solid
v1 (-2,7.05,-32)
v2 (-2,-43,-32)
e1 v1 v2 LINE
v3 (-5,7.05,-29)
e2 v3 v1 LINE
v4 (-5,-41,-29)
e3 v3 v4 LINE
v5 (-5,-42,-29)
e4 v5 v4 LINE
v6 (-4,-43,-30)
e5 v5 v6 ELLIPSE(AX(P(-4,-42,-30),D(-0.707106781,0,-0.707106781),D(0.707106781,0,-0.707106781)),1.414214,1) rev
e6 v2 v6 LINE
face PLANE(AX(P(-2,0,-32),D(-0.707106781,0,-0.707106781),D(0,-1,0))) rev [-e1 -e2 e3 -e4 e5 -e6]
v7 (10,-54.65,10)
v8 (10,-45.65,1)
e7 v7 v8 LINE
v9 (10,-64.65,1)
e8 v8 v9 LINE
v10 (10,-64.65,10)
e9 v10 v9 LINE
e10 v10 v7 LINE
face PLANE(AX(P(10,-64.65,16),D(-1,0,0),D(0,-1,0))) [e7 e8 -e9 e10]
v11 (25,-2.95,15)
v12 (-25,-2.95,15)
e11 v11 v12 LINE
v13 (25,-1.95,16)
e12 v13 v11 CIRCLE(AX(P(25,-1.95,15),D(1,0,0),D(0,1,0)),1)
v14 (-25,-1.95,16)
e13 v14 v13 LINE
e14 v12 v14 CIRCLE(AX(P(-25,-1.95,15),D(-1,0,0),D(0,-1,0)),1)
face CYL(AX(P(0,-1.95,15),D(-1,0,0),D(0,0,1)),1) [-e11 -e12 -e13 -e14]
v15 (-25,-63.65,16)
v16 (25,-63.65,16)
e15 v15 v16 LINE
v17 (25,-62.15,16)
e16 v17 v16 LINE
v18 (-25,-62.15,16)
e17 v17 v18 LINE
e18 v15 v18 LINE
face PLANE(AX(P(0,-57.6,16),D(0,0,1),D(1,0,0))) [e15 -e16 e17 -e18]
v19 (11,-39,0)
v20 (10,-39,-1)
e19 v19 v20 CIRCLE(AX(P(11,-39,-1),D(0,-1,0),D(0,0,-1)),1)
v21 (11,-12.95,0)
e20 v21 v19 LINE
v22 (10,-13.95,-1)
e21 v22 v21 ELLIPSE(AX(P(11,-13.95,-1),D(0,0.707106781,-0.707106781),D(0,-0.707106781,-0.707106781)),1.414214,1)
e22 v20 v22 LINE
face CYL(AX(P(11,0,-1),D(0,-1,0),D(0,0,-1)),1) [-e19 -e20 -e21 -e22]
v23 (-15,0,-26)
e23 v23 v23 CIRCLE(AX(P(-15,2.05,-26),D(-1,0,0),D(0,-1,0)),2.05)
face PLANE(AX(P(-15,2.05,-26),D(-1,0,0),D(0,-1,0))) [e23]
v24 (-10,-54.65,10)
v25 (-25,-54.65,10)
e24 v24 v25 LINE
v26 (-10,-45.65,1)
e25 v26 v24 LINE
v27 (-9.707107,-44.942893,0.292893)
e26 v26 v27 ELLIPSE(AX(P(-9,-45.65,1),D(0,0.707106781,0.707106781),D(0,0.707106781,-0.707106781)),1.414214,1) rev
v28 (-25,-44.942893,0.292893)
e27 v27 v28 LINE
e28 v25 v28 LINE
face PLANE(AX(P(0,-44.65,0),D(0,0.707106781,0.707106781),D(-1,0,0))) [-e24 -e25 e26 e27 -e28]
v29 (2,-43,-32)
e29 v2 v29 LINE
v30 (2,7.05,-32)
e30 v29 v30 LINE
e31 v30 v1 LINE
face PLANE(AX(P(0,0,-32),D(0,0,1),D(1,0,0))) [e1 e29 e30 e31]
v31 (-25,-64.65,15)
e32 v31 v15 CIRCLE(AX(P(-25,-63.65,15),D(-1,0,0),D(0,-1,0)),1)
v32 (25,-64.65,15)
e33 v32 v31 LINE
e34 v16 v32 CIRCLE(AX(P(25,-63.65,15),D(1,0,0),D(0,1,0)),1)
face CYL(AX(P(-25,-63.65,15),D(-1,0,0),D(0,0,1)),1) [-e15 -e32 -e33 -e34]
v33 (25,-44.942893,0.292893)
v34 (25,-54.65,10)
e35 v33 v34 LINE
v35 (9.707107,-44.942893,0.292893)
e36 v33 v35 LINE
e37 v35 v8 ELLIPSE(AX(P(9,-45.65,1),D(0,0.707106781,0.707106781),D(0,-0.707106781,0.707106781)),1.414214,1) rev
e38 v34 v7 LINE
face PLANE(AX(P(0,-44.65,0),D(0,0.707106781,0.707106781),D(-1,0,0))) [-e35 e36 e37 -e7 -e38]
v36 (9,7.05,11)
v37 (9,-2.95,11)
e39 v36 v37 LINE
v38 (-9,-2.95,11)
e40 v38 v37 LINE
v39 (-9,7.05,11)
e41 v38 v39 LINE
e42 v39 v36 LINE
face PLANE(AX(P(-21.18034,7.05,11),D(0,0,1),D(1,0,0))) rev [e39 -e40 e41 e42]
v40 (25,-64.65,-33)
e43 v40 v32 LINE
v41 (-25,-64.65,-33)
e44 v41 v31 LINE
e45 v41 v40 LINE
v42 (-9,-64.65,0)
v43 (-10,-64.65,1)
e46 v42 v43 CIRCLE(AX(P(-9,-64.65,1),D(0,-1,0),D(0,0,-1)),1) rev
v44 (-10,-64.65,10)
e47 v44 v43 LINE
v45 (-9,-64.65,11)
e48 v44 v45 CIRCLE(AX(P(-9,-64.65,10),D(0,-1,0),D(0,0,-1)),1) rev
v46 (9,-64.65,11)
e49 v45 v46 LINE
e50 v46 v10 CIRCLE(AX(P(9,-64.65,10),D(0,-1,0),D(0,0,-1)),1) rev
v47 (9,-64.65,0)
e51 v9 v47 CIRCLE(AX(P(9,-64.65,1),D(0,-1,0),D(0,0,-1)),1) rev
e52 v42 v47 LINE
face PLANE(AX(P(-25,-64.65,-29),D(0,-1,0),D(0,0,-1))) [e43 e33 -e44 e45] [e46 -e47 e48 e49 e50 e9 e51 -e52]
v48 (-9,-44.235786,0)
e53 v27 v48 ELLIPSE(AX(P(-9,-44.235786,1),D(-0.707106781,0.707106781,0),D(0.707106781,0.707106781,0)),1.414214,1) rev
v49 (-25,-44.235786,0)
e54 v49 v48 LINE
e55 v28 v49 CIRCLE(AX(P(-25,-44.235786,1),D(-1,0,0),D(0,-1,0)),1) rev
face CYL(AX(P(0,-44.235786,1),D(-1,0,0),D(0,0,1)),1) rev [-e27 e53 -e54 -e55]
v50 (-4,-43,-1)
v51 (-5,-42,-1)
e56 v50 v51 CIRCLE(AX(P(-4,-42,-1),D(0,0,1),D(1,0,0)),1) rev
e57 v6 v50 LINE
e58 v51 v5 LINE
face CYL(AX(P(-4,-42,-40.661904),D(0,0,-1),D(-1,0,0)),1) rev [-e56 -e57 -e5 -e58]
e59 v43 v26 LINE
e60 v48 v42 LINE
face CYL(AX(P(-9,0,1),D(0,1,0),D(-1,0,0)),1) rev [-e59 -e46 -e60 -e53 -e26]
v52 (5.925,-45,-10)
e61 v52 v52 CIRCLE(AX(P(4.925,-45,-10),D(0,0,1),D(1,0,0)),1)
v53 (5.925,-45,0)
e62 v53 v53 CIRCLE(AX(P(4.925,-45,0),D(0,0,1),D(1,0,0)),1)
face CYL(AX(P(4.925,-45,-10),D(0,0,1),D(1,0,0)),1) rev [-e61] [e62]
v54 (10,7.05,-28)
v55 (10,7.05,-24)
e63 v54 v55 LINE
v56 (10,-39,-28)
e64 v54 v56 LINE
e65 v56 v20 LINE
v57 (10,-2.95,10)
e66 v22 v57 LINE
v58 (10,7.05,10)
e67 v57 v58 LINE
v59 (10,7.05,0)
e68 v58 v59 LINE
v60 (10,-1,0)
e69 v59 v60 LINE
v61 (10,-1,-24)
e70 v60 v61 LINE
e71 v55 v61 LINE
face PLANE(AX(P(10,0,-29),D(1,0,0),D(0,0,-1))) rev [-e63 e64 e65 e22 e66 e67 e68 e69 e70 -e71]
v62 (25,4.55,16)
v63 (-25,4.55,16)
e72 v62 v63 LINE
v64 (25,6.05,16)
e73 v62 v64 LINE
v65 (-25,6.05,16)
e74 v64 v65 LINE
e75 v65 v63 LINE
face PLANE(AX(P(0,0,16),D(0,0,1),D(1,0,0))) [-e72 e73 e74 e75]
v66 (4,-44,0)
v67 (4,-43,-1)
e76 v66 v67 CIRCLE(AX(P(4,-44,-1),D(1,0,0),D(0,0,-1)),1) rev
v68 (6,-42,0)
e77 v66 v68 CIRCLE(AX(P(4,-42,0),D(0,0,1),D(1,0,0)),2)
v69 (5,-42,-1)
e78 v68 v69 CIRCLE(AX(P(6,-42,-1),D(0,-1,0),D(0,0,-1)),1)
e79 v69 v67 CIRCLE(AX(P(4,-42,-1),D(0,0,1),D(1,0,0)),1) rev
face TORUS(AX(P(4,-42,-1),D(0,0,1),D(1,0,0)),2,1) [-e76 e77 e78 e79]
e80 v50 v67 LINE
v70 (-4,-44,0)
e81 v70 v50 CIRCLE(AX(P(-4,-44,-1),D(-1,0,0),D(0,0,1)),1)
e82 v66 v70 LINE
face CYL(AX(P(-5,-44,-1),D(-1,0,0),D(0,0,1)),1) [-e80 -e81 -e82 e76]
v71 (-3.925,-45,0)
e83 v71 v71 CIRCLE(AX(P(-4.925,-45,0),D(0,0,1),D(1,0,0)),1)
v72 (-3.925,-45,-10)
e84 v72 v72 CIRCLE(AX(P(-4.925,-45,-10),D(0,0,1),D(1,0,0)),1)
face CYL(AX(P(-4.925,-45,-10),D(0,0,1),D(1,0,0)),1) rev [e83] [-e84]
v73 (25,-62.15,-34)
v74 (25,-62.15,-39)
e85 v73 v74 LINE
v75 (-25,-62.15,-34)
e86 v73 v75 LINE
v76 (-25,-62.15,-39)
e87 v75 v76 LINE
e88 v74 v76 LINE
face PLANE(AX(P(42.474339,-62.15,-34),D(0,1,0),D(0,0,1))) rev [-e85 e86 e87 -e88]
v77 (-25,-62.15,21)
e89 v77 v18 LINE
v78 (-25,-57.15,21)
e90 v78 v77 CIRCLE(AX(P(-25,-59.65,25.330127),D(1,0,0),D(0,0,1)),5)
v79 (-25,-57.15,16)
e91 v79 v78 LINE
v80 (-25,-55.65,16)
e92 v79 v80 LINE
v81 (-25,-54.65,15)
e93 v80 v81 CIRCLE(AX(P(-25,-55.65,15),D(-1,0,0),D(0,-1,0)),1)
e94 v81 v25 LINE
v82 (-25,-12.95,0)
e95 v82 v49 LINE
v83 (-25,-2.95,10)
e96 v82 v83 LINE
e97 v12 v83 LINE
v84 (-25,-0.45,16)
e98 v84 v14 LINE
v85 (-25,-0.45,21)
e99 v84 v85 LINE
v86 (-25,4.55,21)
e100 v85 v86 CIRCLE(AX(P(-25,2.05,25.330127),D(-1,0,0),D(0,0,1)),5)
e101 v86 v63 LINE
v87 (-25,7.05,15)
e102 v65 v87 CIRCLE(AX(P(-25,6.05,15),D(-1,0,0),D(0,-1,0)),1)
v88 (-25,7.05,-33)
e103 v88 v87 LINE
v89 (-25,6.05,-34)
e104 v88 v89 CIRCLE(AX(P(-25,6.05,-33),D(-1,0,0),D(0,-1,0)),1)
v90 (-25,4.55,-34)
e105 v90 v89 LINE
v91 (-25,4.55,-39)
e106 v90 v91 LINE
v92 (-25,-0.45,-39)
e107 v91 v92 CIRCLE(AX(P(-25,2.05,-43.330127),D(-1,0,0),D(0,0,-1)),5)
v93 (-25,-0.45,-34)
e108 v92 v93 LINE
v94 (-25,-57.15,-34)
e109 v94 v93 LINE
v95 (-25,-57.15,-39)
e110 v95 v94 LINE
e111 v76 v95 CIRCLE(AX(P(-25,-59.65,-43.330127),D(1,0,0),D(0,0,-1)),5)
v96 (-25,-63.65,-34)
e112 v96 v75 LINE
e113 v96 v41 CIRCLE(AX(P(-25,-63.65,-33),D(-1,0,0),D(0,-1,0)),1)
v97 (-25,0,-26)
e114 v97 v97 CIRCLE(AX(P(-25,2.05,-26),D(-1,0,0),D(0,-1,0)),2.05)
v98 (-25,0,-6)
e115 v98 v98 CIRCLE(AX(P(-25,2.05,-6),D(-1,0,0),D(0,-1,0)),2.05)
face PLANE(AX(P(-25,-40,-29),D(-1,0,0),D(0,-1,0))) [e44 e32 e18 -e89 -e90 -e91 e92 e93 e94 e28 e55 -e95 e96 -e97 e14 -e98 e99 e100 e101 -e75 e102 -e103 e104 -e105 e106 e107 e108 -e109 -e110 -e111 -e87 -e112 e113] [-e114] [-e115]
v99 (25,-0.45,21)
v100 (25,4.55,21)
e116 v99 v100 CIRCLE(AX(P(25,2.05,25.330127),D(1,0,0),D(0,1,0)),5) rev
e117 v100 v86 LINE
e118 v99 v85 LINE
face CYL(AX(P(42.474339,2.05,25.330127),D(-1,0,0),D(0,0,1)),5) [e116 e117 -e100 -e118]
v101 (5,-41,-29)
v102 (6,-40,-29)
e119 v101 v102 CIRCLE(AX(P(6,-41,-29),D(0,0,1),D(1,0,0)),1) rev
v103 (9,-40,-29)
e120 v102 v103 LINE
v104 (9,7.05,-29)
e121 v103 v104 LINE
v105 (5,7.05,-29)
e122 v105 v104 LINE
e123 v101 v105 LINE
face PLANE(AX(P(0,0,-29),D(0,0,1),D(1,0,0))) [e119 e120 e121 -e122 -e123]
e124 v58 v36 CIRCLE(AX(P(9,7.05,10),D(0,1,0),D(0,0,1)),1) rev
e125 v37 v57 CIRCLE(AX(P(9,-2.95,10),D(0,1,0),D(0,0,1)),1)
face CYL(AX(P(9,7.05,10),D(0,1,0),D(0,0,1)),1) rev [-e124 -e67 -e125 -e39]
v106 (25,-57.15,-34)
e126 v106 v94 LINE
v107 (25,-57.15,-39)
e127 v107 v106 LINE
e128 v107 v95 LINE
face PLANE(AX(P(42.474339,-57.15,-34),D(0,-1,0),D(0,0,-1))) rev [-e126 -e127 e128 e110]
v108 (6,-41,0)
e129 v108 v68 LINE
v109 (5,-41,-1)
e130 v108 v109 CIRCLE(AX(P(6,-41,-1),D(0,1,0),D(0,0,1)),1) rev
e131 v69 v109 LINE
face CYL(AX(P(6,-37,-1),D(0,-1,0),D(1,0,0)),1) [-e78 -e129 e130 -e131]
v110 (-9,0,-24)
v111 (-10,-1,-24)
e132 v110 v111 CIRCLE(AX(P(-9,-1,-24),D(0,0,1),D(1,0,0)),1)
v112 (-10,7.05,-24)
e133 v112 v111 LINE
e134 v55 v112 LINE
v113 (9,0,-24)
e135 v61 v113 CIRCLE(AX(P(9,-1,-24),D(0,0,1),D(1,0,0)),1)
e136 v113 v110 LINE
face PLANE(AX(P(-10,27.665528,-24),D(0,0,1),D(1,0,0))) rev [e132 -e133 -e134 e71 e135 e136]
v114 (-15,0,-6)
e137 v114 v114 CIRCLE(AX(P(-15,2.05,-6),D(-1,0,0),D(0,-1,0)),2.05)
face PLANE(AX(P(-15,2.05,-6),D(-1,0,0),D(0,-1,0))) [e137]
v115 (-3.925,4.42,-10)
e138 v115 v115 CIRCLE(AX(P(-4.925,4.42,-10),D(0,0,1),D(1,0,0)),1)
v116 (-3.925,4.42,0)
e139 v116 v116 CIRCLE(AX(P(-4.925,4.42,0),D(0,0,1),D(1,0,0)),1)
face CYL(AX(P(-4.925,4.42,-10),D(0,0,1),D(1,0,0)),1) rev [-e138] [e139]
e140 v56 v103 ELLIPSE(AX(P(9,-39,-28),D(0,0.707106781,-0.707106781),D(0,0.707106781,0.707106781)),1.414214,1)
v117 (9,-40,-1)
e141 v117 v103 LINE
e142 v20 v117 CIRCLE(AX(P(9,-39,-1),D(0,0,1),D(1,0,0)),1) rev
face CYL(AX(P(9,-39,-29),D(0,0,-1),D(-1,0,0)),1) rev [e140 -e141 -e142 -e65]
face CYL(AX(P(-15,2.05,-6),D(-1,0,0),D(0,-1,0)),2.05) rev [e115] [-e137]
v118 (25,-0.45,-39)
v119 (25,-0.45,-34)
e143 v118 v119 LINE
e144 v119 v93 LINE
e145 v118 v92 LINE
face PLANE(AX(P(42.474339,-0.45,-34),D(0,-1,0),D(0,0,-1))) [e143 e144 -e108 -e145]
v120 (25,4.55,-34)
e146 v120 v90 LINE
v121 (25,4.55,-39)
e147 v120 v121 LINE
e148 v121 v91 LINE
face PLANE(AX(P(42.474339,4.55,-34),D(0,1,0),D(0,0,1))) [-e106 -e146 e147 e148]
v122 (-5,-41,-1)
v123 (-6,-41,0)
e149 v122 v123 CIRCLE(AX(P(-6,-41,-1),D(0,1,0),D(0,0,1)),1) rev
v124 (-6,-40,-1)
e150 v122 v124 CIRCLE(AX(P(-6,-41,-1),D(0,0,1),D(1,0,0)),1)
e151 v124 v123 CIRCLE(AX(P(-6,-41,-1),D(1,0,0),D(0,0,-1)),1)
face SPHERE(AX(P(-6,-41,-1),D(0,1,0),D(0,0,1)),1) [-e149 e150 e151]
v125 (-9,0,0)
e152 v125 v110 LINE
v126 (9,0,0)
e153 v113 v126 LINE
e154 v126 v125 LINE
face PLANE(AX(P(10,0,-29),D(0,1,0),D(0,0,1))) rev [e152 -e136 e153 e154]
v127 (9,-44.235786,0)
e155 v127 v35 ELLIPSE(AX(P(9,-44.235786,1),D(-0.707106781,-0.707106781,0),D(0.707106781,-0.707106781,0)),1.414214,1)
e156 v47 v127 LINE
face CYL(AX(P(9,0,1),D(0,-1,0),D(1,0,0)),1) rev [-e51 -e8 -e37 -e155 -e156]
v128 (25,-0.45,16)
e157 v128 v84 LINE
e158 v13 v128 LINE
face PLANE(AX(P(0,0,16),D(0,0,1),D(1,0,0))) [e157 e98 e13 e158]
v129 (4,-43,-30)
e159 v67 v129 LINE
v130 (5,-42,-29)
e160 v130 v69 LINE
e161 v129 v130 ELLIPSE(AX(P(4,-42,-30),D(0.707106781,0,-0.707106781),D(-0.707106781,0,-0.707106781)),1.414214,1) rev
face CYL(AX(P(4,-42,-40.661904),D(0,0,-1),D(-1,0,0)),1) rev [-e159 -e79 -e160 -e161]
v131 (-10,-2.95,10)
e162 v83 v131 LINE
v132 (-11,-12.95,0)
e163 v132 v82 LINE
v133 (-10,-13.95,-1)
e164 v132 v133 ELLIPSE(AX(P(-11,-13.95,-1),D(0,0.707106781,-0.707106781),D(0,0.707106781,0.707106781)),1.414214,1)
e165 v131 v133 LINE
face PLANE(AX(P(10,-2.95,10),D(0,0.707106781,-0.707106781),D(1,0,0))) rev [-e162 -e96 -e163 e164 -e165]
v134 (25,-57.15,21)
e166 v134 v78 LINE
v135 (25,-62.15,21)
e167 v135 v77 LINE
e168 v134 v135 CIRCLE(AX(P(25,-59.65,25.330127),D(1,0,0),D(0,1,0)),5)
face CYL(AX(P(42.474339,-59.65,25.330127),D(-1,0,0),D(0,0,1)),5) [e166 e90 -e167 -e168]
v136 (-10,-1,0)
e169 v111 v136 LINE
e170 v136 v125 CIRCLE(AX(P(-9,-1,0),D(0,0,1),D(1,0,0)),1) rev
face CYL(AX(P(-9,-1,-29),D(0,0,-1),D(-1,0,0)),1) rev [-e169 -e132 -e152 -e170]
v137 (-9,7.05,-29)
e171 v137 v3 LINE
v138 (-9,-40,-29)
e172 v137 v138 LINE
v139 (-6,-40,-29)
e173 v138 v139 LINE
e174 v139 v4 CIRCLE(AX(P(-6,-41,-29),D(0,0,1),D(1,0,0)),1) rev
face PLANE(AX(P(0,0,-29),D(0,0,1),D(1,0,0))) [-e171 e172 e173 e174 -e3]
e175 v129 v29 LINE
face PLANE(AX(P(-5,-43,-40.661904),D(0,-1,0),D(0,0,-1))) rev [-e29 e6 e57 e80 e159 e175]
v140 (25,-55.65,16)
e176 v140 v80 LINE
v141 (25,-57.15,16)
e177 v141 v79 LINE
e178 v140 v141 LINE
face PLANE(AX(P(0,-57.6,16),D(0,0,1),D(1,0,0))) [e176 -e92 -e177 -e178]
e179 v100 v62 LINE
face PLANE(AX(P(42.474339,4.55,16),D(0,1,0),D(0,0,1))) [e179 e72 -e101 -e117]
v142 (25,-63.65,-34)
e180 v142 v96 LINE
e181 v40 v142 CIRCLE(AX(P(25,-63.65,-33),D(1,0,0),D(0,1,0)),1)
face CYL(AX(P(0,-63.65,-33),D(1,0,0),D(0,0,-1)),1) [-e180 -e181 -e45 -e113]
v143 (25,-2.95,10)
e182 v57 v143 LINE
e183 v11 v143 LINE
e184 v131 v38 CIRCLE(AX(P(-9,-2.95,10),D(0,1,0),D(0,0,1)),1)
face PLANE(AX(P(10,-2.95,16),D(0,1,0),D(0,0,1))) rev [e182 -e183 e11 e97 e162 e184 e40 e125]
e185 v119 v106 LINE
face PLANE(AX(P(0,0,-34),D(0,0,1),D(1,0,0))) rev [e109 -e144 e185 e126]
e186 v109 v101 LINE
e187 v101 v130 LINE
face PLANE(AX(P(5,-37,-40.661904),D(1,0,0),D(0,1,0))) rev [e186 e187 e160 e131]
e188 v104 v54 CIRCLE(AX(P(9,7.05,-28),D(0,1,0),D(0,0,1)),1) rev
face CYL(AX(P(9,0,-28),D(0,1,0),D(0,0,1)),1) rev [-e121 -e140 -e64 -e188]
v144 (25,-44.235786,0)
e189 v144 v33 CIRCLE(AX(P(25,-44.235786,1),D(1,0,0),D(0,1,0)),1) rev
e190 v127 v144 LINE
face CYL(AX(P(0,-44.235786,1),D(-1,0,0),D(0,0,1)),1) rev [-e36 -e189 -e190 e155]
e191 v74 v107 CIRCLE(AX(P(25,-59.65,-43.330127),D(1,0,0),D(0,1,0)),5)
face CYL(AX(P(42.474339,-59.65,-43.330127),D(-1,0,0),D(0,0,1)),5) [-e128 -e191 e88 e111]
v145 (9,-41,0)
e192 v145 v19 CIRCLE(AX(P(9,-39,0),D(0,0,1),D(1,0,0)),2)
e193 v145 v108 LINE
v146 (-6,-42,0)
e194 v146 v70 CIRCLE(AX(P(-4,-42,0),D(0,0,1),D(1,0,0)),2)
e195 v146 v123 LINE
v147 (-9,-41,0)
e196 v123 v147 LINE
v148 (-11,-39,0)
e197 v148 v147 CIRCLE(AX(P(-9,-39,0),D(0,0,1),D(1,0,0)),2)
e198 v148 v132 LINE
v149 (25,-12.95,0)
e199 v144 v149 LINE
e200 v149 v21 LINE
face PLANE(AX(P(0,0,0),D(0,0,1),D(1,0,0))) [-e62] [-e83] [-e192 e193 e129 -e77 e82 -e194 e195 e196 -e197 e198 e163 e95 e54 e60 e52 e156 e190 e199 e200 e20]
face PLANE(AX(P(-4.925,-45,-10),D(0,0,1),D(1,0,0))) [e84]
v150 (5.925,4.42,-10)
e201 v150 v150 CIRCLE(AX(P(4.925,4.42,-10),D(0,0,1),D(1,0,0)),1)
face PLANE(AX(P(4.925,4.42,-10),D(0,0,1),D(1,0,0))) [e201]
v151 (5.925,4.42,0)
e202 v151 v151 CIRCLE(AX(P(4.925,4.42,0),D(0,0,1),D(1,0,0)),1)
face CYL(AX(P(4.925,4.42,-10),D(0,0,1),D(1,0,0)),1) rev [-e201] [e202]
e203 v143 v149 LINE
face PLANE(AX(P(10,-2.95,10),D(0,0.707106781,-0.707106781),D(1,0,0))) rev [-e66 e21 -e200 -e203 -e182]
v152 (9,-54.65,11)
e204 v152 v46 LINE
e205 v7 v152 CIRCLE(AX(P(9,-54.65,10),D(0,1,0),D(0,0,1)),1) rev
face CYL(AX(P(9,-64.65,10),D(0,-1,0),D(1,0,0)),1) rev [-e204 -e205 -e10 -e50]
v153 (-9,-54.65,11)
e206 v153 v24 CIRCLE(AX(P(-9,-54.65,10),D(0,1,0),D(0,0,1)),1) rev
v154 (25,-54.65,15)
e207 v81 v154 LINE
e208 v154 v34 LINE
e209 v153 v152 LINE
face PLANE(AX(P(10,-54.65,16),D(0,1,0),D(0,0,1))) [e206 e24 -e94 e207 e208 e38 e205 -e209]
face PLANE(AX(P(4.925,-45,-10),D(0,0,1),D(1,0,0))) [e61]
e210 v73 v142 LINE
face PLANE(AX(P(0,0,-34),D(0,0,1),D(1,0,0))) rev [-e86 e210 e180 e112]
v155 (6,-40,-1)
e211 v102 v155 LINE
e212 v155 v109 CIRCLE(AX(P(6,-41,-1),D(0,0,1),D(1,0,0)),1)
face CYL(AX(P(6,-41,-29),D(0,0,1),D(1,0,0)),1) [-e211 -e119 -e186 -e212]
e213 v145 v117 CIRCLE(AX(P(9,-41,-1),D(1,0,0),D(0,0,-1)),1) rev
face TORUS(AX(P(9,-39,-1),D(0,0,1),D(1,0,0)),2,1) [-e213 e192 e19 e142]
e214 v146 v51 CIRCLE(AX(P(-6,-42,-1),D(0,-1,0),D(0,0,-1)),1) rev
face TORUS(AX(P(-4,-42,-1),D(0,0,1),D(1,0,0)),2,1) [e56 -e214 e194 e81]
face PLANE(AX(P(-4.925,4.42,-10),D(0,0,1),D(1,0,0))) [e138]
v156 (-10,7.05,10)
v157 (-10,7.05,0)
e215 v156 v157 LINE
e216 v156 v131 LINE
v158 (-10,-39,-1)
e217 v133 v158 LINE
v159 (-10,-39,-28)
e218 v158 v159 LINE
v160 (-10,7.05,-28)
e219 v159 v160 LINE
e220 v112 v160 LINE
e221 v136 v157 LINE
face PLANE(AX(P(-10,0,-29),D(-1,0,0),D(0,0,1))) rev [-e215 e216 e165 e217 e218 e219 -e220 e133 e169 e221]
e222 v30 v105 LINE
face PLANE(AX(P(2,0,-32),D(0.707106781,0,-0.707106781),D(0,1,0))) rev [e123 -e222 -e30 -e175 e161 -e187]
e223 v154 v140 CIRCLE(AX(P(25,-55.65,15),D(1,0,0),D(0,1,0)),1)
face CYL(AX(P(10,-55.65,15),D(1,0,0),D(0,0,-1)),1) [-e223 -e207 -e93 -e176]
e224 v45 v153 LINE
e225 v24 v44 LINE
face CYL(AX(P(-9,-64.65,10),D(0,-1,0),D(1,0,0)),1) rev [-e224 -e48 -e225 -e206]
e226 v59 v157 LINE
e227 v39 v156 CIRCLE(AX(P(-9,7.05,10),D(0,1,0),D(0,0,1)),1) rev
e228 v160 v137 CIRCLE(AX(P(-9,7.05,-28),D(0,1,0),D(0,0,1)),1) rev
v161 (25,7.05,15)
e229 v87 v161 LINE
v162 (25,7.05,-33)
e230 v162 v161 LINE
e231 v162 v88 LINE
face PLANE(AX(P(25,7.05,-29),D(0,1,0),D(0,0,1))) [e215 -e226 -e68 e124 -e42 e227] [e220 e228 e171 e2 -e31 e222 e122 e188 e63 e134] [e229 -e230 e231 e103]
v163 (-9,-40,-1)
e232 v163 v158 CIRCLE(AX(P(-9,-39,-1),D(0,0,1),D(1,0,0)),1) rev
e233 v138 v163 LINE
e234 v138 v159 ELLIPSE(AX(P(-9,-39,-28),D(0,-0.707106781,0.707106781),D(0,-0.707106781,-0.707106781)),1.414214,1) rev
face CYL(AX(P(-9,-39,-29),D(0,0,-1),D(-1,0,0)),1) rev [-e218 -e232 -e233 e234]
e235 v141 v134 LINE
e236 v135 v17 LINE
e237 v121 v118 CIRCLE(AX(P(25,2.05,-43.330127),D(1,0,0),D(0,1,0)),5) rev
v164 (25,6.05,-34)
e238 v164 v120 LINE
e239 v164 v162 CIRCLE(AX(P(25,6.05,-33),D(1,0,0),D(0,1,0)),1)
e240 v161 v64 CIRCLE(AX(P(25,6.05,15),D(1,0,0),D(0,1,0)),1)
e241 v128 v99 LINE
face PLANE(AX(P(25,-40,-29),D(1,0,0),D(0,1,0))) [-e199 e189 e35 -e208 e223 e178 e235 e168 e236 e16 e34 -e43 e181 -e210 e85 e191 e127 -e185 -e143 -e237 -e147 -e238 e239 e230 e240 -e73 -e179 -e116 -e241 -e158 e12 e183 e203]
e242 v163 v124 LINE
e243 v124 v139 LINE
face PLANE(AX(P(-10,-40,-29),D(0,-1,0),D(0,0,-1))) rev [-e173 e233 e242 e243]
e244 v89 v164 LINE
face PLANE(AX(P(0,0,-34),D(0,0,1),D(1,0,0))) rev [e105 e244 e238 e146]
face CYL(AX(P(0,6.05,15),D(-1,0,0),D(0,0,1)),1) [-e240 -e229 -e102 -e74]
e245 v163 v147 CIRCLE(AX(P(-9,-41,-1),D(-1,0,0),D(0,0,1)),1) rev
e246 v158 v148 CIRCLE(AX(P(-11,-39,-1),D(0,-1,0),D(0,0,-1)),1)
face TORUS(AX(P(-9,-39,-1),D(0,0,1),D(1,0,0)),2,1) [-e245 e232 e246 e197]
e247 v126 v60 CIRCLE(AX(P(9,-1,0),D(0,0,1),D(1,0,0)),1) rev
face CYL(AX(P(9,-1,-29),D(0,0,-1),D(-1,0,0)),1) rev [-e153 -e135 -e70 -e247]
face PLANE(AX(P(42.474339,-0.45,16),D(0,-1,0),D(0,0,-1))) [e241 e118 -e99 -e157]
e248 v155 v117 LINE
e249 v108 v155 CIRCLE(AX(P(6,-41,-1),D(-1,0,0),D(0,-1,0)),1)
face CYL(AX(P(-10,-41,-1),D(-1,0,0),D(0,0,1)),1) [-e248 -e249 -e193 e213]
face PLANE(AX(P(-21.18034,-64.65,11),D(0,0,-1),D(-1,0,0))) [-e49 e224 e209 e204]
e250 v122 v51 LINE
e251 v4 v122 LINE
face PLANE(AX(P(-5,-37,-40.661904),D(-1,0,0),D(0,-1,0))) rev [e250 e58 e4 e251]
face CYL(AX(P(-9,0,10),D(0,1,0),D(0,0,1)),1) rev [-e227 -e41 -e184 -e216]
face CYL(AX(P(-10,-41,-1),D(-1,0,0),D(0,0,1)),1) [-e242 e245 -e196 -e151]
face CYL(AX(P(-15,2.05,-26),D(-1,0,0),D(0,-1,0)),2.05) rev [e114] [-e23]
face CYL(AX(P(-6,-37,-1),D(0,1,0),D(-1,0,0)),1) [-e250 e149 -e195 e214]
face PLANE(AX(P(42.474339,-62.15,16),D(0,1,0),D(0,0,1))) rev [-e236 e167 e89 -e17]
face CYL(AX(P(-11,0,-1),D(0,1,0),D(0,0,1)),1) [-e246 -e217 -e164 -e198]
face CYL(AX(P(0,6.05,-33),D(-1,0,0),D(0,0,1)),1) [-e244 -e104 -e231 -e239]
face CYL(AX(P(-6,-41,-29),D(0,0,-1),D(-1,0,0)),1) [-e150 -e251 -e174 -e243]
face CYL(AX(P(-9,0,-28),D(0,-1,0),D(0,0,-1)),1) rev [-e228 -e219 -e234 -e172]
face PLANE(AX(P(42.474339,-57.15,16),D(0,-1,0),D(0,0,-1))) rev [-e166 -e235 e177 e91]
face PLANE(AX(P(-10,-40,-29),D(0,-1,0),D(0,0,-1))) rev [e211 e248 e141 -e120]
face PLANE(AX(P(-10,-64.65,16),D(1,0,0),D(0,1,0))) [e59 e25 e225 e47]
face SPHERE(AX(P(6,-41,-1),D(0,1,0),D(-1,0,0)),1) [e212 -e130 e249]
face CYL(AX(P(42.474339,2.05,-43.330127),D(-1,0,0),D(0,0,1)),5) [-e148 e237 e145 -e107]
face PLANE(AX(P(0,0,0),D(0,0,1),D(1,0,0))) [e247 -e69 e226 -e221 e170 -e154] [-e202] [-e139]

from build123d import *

# Parameters (mm, degrees)
ESBO_O2_W                = 20
ESBO_O2_H                = 40
RESSALTO_EXTRUS_O2_DEPTH = 29
ESBO_O3_W                = 15
ESBO_O3_H                = 10
RESSALTO_EXTRUS_O3_DEPTH = 16
ESBO_O4_W                = 5
ESBO_O4_H                = 10
RESSALTO_EXTRUS_O4_DEPTH = 20
ESBO_O5_W                = 50
ESBO_O5_H                = 71.7
RESSALTO_EXTRUS_O5_DEPTH = 5
RESSALTO_EXTRUS_O6_DEPTH = 50
ESBO_O9_W                = 10
ESBO_O9_H                = 6
CORTE_EXTRUS_O1_DEPTH    = 29
ESBO_O10_W               = 20
ESBO_O10_H               = 5
CORTE_EXTRUS_O2_DEPTH    = 7.05
ESBO_O11_W               = 10
ESBO_O11_H               = 50.05
CORTE_EXTRUS_O3_DEPTH    = 3
CHANFRO4_SIZE            = 3
ESBO_O12_R               = 1
CORTE_EXTRUS_O4_DEPTH    = 10
CHANFRO5_SIZE            = 10
FILETE2_R                = 1
ESBO_O19_R               = 2.05
CORTE_EXTRUS_O7_DEPTH    = 10


with BuildPart() as part:
    # Esboço2 → Ressalto-extrusão2 (new body)
    with BuildSketch(Plane.XY):
        Polygon((25, 0), (25, 7.05), (-25, 7.05), (-25, 0), (-25, -40), (-25, -64.65), (25, -64.65), (25, -40), align=None)
        with Locations((0, -20)):
            Rectangle(ESBO_O2_W, ESBO_O2_H, mode=Mode.SUBTRACT)
    extrude(amount=-RESSALTO_EXTRUS_O2_DEPTH)

    # Esboço3 → Ressalto-extrusão3 (add)
    with BuildSketch(Plane.XY):
        with Locations((17.5, 2.05)):
            Rectangle(ESBO_O3_W, ESBO_O3_H)
        with Locations((-17.5, 2.05)):
            Rectangle(ESBO_O3_W, ESBO_O3_H)
    ressalto_extrus_o3 = extrude(amount=RESSALTO_EXTRUS_O3_DEPTH)

    # Esboço4 → Ressalto-extrusão4 (add)
    with BuildSketch(Plane.ZY.offset(-10)):
        with Locations((13.5, 2.05)):
            Rectangle(ESBO_O4_W, ESBO_O4_H)
    ressalto_extrus_o4 = extrude(amount=RESSALTO_EXTRUS_O4_DEPTH)

    # Esboço5 → Ressalto-extrusão5 (add)
    with BuildSketch(Plane(origin=(0, 0, -29), x_dir=(-1, 0, 0), z_dir=(0, 0, -1))):
        with Locations((0, -28.8)):
            Rectangle(ESBO_O5_W, ESBO_O5_H)
    extrude(amount=RESSALTO_EXTRUS_O5_DEPTH)

    # Esboço6 → Ressalto-extrusão6 (add)
    with BuildSketch(Plane.ZY.offset(25)):
        with BuildLine():
            Line((16, 4.55), (21, 4.55))
            ThreePointArc((21, 4.55), (30.330127019, 2.05), (21, -0.45))
            Line((21, -0.45), (16, -0.45))
            Line((16, -0.45), (16, 4.55))
        make_face()
        with BuildLine():
            Line((-34, 4.55), (-34, -0.45))
            Line((-34, -0.45), (-39, -0.45))
            ThreePointArc((-39, -0.45), (-48.330127019, 2.05), (-39, 4.55))
            Line((-39, 4.55), (-34, 4.55))
        make_face()
    ressalto_extrus_o6 = extrude(amount=-RESSALTO_EXTRUS_O6_DEPTH)

    # Espelhar2: Ressalto-extrusão3, Ressalto-extrusão4, Ressalto-extrusão6 across plane
    add(ressalto_extrus_o3.mirror(Plane(origin=(0, -28.8, 0), x_dir=(0, 0, 1), z_dir=(0, -1, 0))))
    add(ressalto_extrus_o4.mirror(Plane(origin=(0, -28.8, 0), x_dir=(0, 0, 1), z_dir=(0, -1, 0))))
    add(ressalto_extrus_o6.mirror(Plane(origin=(0, -28.8, 0), x_dir=(0, 0, 1), z_dir=(0, -1, 0))))

    # Esboço9 → Corte-extrusão1 (cut)
    with BuildSketch(Plane.XY):
        with Locations((0, -40)):
            Rectangle(ESBO_O9_W, ESBO_O9_H)
    extrude(amount=-CORTE_EXTRUS_O1_DEPTH, mode=Mode.SUBTRACT)

    # Esboço10 → Corte-extrusão2 (cut)
    with BuildSketch(Plane.XZ):
        with Locations((0, -26.5)):
            Rectangle(ESBO_O10_W, ESBO_O10_H)
    extrude(amount=-CORTE_EXTRUS_O2_DEPTH, mode=Mode.SUBTRACT)

    # Esboço11 → Corte-extrusão3 (cut)
    with BuildSketch(Plane.XY.offset(-29)):
        with Locations((0, -17.975)):
            Rectangle(ESBO_O11_W, ESBO_O11_H)
    extrude(amount=-CORTE_EXTRUS_O3_DEPTH, mode=Mode.SUBTRACT)

    # Chanfro4
    chanfro4_edges = [part.edges().sort_by_distance(p)[0] for p in [
        (-5, -17.975, -32),
        (5, -17.975, -32),
    ]]
    chamfer(chanfro4_edges, length=CHANFRO4_SIZE)

    # Esboço12 → Corte-extrusão4 (cut)
    with BuildSketch(Plane.XY):
        with Locations((-4.925, 4.42)):
            Circle(ESBO_O12_R)
        with Locations((4.925, 4.42)):
            Circle(ESBO_O12_R)
        with Locations((4.925, -45)):
            Circle(ESBO_O12_R)
        with Locations((-4.925, -45)):
            Circle(ESBO_O12_R)
    extrude(amount=-CORTE_EXTRUS_O4_DEPTH, mode=Mode.SUBTRACT)

    # Chanfro5
    chanfro5_edges = [part.edges().sort_by_distance(p)[0] for p in [
        (17.5, -54.65, 0),
        (-17.5, -54.65, 0),
        (17.5, -2.95, 0),
        (-17.5, -2.95, 0),
    ]]
    chamfer(chanfro5_edges, length=CHANFRO5_SIZE)

    # Filete2
    # the kernel refuses this fillet: 1 mm, written as the material it adds along each edge
    with BuildSketch(Plane(origin=(10, -64.65, 0), x_dir=(0, 0, 1), z_dir=(0, 1, 0))) as filete2_piece_1_section:
        with BuildLine():
            CenterArc((FILETE2_R, -FILETE2_R), FILETE2_R, 90, 90)
            Line((0, -FILETE2_R), (0, 0))
            Line((0, 0), (FILETE2_R, 0))
        make_face()
    filete2_piece_1 = extrude(amount=22.5, mode=Mode.PRIVATE)
    filete2_piece_1 = split(filete2_piece_1, bisect_by=Plane(origin=(9.772216332, -49.818033507, 5.168033507), z_dir=(0, -0.7071067811865476, -0.7071067811865476)), keep=Keep.TOP, mode=Mode.PRIVATE)
    add(filete2_piece_1)
    with BuildSketch(Plane(origin=(-10, -42.15, 0), x_dir=(0, 0, 1), z_dir=(0, -1, 0))) as filete2_piece_2_section:
        with BuildLine():
            CenterArc((FILETE2_R, -FILETE2_R), FILETE2_R, 90, 90)
            Line((0, -FILETE2_R), (0, 0))
            Line((0, 0), (FILETE2_R, 0))
        make_face()
    filete2_piece_2 = extrude(amount=22.5, mode=Mode.PRIVATE)
    filete2_piece_2 = split(filete2_piece_2, bisect_by=Plane(origin=(-9.772216332, -49.818033507, 5.168033507), z_dir=(0, -0.7071067811865476, -0.7071067811865476)), keep=Keep.TOP, mode=Mode.PRIVATE)
    add(filete2_piece_2)
    with BuildSketch(Plane(origin=(10, -64.65, 11), x_dir=(0, 0, -1), z_dir=(0, 1, 0)), Plane(origin=(-10, -64.65, 11), x_dir=(1, 0, 0), z_dir=(0, 1, 0)), Plane(origin=(-10, 7.05, 11), x_dir=(0, 0, -1), z_dir=(0, -1, 0))) as filete2_piece_3:
        with BuildLine():
            CenterArc((FILETE2_R, FILETE2_R), FILETE2_R, 180, 90)
            Line((0, FILETE2_R), (0, 0))
            Line((0, 0), (FILETE2_R, 0))
        make_face()
    extrude(amount=10)
    with BuildSketch(Plane(origin=(-10, 0, 0), x_dir=(1, 0, 0), z_dir=(0, 0, -1)), Plane(origin=(10, 0, 0), x_dir=(0, -1, 0), z_dir=(0, 0, -1))) as filete2_piece_4:
        with BuildLine():
            CenterArc((FILETE2_R, FILETE2_R), FILETE2_R, 180, 90)
            Line((0, FILETE2_R), (0, 0))
            Line((0, 0), (FILETE2_R, 0))
        make_face()
    extrude(amount=24)
    with BuildSketch(Plane(origin=(5, -43, 0), x_dir=(0, 1, 0), z_dir=(0, 0, -1)), Plane(origin=(-5, -43, 0), x_dir=(1, 0, 0), z_dir=(0, 0, -1)), Plane(origin=(10, -40, 0), x_dir=(0, 1, 0), z_dir=(0, 0, -1))) as filete2_piece_5:
        with BuildLine():
            CenterArc((FILETE2_R, -FILETE2_R), FILETE2_R, 90, 90)
            Line((0, -FILETE2_R), (0, 0))
            Line((0, 0), (FILETE2_R, 0))
        make_face()
    extrude(amount=31.5)
    with BuildSketch(Plane(origin=(10, 7.05, -29), x_dir=(0, 0, 1), z_dir=(0, -1, 0)), Plane(origin=(-10, -42.5, -29), x_dir=(0, 0, 1), z_dir=(0, 1, 0))) as filete2_piece_6:
        with BuildLine():
            CenterArc((FILETE2_R, FILETE2_R), FILETE2_R, 180, 90)
            Line((0, FILETE2_R), (0, 0))
            Line((0, 0), (FILETE2_R, 0))
        make_face()
    extrude(amount=49.55)
    with BuildSketch(Plane(origin=(25, -44.65, 0), x_dir=(0, -0.7071067811865505, 0.7071067811865446), z_dir=(-1, 0, 0))) as filete2_piece_7:
        with BuildLine():
            CenterArc((FILETE2_R * 0.414213562373, FILETE2_R), FILETE2_R, 225, 45)
            Line((-FILETE2_R * 0.292893218813, FILETE2_R * 0.292893218813), (0, 0))
            Line((0, 0), (FILETE2_R * 0.414213562373, 0))
        make_face()
    extrude(amount=15)
    with BuildSketch(Plane(origin=(-10, -40, 0), x_dir=(0, 1, 0), z_dir=(0, 0, -1))) as filete2_piece_8:
        with BuildLine():
            CenterArc((FILETE2_R, FILETE2_R), FILETE2_R, 180, 90)
            Line((0, FILETE2_R), (0, 0))
            Line((0, 0), (FILETE2_R, 0))
        make_face()
    extrude(amount=31.5)
    with BuildSketch(Plane(origin=(-25, -44.65, 0), x_dir=(0, -0.7071067811865505, 0.7071067811865446), z_dir=(1, 0, 0))) as filete2_piece_9:
        with BuildLine():
            CenterArc((FILETE2_R * 0.414213562373, -FILETE2_R), FILETE2_R, 90, 45)
            Line((-FILETE2_R * 0.292893218813, -FILETE2_R * 0.292893218813), (0, 0))
            Line((0, 0), (FILETE2_R * 0.414213562373, 0))
        make_face()
    extrude(amount=15)
    with BuildSketch(Plane(origin=(10, 7.05, 11), x_dir=(0, 0, -1), z_dir=(0, -1, 0))) as filete2_piece_10:
        with BuildLine():
            CenterArc((FILETE2_R, -FILETE2_R), FILETE2_R, 90, 90)
            Line((0, -FILETE2_R), (0, 0))
            Line((0, 0), (FILETE2_R, 0))
        make_face()
    extrude(amount=10)
    with BuildSketch(Plane(origin=(25, -44.65, 0), x_dir=(0, -0.7071067811865505, 0.7071067811865446), z_dir=(-1, 0, 0))) as filete2_piece_11a_section:
        with BuildLine():
            CenterArc((FILETE2_R * 0.414213562373, FILETE2_R), FILETE2_R, 225, 45)
            Line((-FILETE2_R * 0.292893218813, FILETE2_R * 0.292893218813), (0, 0))
            Line((0, 0), (FILETE2_R * 0.414213562373, 0))
        make_face()
    filete2_piece_11a = extrude(amount=16.035533906, mode=Mode.PRIVATE)
    filete2_piece_11a = split(filete2_piece_11a, bisect_by=Plane(origin=(10, -44.624397401, 0.061810142), z_dir=(-1, 0, 0)), keep=Keep.TOP, mode=Mode.PRIVATE)
    with BuildSketch(Plane(origin=(10, -64.65, 0), x_dir=(0, 0, 1), z_dir=(0, 1, 0))) as filete2_piece_11b_section:
        with BuildLine():
            CenterArc((FILETE2_R, -FILETE2_R), FILETE2_R, 90, 90)
            Line((0, -FILETE2_R), (0, 0))
            Line((0, 0), (FILETE2_R, 0))
        make_face()
    filete2_piece_11b = extrude(amount=22.5, mode=Mode.PRIVATE)
    filete2_piece_11b = split(filete2_piece_11b, bisect_by=Plane(origin=(9.783675587, -44.207581525, -0.442418475), z_dir=(0, 0.7071067811865476, 0.7071067811865476)), keep=Keep.TOP, mode=Mode.PRIVATE)
    filete2_piece_11 = filete2_piece_11a & filete2_piece_11b
    add(filete2_piece_11)
    with BuildSketch(Plane(origin=(-10, -42.15, 0), x_dir=(0, 0, 1), z_dir=(0, -1, 0))) as filete2_piece_12a_section:
        with BuildLine():
            CenterArc((FILETE2_R, -FILETE2_R), FILETE2_R, 90, 90)
            Line((0, -FILETE2_R), (0, 0))
            Line((0, 0), (FILETE2_R, 0))
        make_face()
    filete2_piece_12a = extrude(amount=22.5, mode=Mode.PRIVATE)
    filete2_piece_12a = split(filete2_piece_12a, bisect_by=Plane(origin=(-9.783675587, -44.207581525, -0.442418475), z_dir=(0, 0.7071067811865476, 0.7071067811865476)), keep=Keep.TOP, mode=Mode.PRIVATE)
    with BuildSketch(Plane(origin=(-25, -44.65, 0), x_dir=(0, -0.7071067811865505, 0.7071067811865446), z_dir=(1, 0, 0))) as filete2_piece_12b_section:
        with BuildLine():
            CenterArc((FILETE2_R * 0.414213562373, -FILETE2_R), FILETE2_R, 90, 45)
            Line((-FILETE2_R * 0.292893218813, -FILETE2_R * 0.292893218813), (0, 0))
            Line((0, 0), (FILETE2_R * 0.414213562373, 0))
        make_face()
    filete2_piece_12b = extrude(amount=16.035533906, mode=Mode.PRIVATE)
    filete2_piece_12b = split(filete2_piece_12b, bisect_by=Plane(origin=(-10, -44.624397401, 0.061810142), z_dir=(1, 0, 0)), keep=Keep.TOP, mode=Mode.PRIVATE)
    filete2_piece_12 = filete2_piece_12a & filete2_piece_12b
    add(filete2_piece_12)
    # the kernel refuses this fillet: 1 mm, written as the material it takes off along each edge
    with BuildSketch(Plane(origin=(-27.5, -64.65, 16), x_dir=(0, 0, -1), z_dir=(1, 0, 0)), Plane(origin=(-27.5, -54.65, 16), x_dir=(0, -1, 0), z_dir=(1, 0, 0)), Plane(origin=(-27.5, -2.95, 16), x_dir=(0, 0, -1), z_dir=(1, 0, 0)), Plane(origin=(-27.5, 7.05, 16), x_dir=(0, -1, 0), z_dir=(1, 0, 0))) as filete2_2_piece_1:
        with BuildLine():
            CenterArc((FILETE2_R, FILETE2_R), FILETE2_R, 180, 90)
            Line((0, FILETE2_R), (0, 0))
            Line((0, 0), (FILETE2_R, 0))
        make_face()
    extrude(amount=55, mode=Mode.SUBTRACT)
    with BuildSketch(Plane(origin=(5, -40, -29), x_dir=(1, 0, 0), z_dir=(0, 0, 1))) as filete2_2_piece_2_section:
        with BuildLine():
            CenterArc((FILETE2_R, -FILETE2_R), FILETE2_R, 90, 90)
            Line((0, -FILETE2_R), (0, 0))
            Line((0, 0), (FILETE2_R, 0))
        make_face()
    filete2_2_piece_2 = extrude(amount=31.5, mode=Mode.PRIVATE)
    filete2_2_piece_2 = split(filete2_2_piece_2, bisect_by=Plane(origin=(5.322588538, -40.106472513, -28.677411462), z_dir=(0.7071067811865476, 0, -0.7071067811865476)), keep=Keep.TOP, mode=Mode.PRIVATE)
    add(filete2_2_piece_2, mode=Mode.SUBTRACT)
    with BuildSketch(Plane(origin=(5, -40, -29), x_dir=(1, 0, 0), z_dir=(0, 0, 1))) as filete2_2_piece_3_section:
        with BuildLine():
            CenterArc((FILETE2_R, -FILETE2_R), FILETE2_R, 90, 90)
            Line((0, -FILETE2_R), (0, 0))
            Line((0, 0), (FILETE2_R, 0))
        make_face()
    filete2_2_piece_3 = extrude(amount=31.5, mode=Mode.PRIVATE)
    filete2_2_piece_3 = split(filete2_2_piece_3, bisect_by=Plane(origin=(13.043887761, -40.227266345, -20.956112239), z_dir=(-0.7071067811865476, 0, 0.7071067811865476)), keep=Keep.TOP, mode=Mode.PRIVATE)
    add(filete2_2_piece_3, mode=Mode.SUBTRACT)
    with BuildSketch(Plane(origin=(-5, -40, 2.5), x_dir=(-1, 0, 0), z_dir=(0, 0, -1))) as filete2_2_piece_4_section:
        with BuildLine():
            CenterArc((FILETE2_R, -FILETE2_R), FILETE2_R, 90, 90)
            Line((0, -FILETE2_R), (0, 0))
            Line((0, 0), (FILETE2_R, 0))
        make_face()
    filete2_2_piece_4 = extrude(amount=31.5, mode=Mode.PRIVATE)
    filete2_2_piece_4 = split(filete2_2_piece_4, bisect_by=Plane(origin=(-13.043887761, -40.227266345, -20.956112239), z_dir=(0.7071067811865476, 0, 0.7071067811865476)), keep=Keep.TOP, mode=Mode.PRIVATE)
    add(filete2_2_piece_4, mode=Mode.SUBTRACT)
    with BuildSketch(Plane(origin=(-5, -40, 2.5), x_dir=(-1, 0, 0), z_dir=(0, 0, -1))) as filete2_2_piece_5_section:
        with BuildLine():
            CenterArc((FILETE2_R, -FILETE2_R), FILETE2_R, 90, 90)
            Line((0, -FILETE2_R), (0, 0))
            Line((0, 0), (FILETE2_R, 0))
        make_face()
    filete2_2_piece_5 = extrude(amount=31.5, mode=Mode.PRIVATE)
    filete2_2_piece_5 = split(filete2_2_piece_5, bisect_by=Plane(origin=(-5.322588538, -40.106472513, -28.677411462), z_dir=(-0.7071067811865476, 0, -0.7071067811865476)), keep=Keep.TOP, mode=Mode.PRIVATE)
    add(filete2_2_piece_5, mode=Mode.SUBTRACT)
    with BuildSketch(Plane(origin=(-27.5, 7.05, -34), x_dir=(0, -1, 0), z_dir=(1, 0, 0)), Plane(origin=(27.5, -64.65, -34), x_dir=(0, 1, 0), z_dir=(-1, 0, 0))) as filete2_2_piece_6:
        with BuildLine():
            CenterArc((FILETE2_R, -FILETE2_R), FILETE2_R, 90, 90)
            Line((0, -FILETE2_R), (0, 0))
            Line((0, 0), (FILETE2_R, 0))
        make_face()
    extrude(amount=55, mode=Mode.SUBTRACT)
    # the kernel refuses this fillet: 1 mm, written as the material it takes off along each edge
    with BuildSketch(Plane(origin=(9, -40, 0), x_dir=(0, 0, -1), z_dir=(-1, 0, 0)), Plane(origin=(-6, -40, 0), x_dir=(0, 0, -1), z_dir=(-1, 0, 0))) as filete2_3_piece_1:
        with BuildLine():
            CenterArc((FILETE2_R, FILETE2_R), FILETE2_R, 180, 90)
            Line((0, FILETE2_R), (0, 0))
            Line((0, 0), (FILETE2_R, 0))
        make_face()
    extrude(amount=3, mode=Mode.SUBTRACT)
    with BuildSketch(Plane(origin=(5, -41, 0), x_dir=(0, 0, -1), z_dir=(0, -1, 0)), Plane(origin=(-5, -42, 0), x_dir=(0, 0, -1), z_dir=(0, 1, 0))) as filete2_3_piece_2:
        with BuildLine():
            CenterArc((FILETE2_R, FILETE2_R), FILETE2_R, 180, 90)
            Line((0, FILETE2_R), (0, 0))
            Line((0, 0), (FILETE2_R, 0))
        make_face()
    extrude(amount=1, mode=Mode.SUBTRACT)
    with BuildSketch(Plane(origin=(4, -43, 0), x_dir=(0, 0, -1), z_dir=(-1, 0, 0))) as filete2_3_piece_3:
        with BuildLine():
            CenterArc((FILETE2_R, FILETE2_R), FILETE2_R, 180, 90)
            Line((0, FILETE2_R), (0, 0))
            Line((0, 0), (FILETE2_R, 0))
        make_face()
    extrude(amount=8, mode=Mode.SUBTRACT)
    with BuildSketch(Plane(origin=(-10, -39, 0), x_dir=(0, 0, -1), z_dir=(0, 1, 0))) as filete2_3_piece_4_section:
        with BuildLine():
            CenterArc((FILETE2_R, FILETE2_R), FILETE2_R, 180, 90)
            Line((0, FILETE2_R), (0, 0))
            Line((0, 0), (FILETE2_R, 0))
        make_face()
    filete2_3_piece_4 = extrude(amount=28.55, mode=Mode.PRIVATE)
    filete2_3_piece_4 = split(filete2_3_piece_4, bisect_by=Plane(origin=(-10.227458355, -19.630946506, -6.680946506), z_dir=(0, -0.7071067811865476, 0.7071067811865476)), keep=Keep.TOP, mode=Mode.PRIVATE)
    add(filete2_3_piece_4, mode=Mode.SUBTRACT)
    with BuildSketch(Plane(origin=(10, -10.45, 0), x_dir=(0, 0, -1), z_dir=(0, -1, 0))) as filete2_3_piece_5_section:
        with BuildLine():
            CenterArc((FILETE2_R, FILETE2_R), FILETE2_R, 180, 90)
            Line((0, FILETE2_R), (0, 0))
            Line((0, 0), (FILETE2_R, 0))
        make_face()
    filete2_3_piece_5 = extrude(amount=28.55, mode=Mode.PRIVATE)
    filete2_3_piece_5 = split(filete2_3_piece_5, bisect_by=Plane(origin=(10.227458355, -19.630946506, -6.680946506), z_dir=(0, -0.7071067811865476, 0.7071067811865476)), keep=Keep.TOP, mode=Mode.PRIVATE)
    add(filete2_3_piece_5, mode=Mode.SUBTRACT)
    with BuildSketch(Plane(origin=(9, -39, 0), x_dir=(1, 0, 0), z_dir=(0, 1, 0))) as filete2_3_piece_6:
        with BuildLine():
            CenterArc((1 + FILETE2_R, FILETE2_R), FILETE2_R, 180, 90)
            Line((1 + FILETE2_R, 0), (1, 0))
            Line((1, 0), (1, FILETE2_R))
        make_face()
    revolve(axis=Axis((9, -39, 0), (0, 0, -1)), revolution_arc=90, mode=Mode.SUBTRACT)
    with BuildSketch(Plane(origin=(-6, -41, 0), x_dir=(1, 0, 0), z_dir=(0, -1, 0))) as filete2_3_piece_7:
        with BuildLine():
            CenterArc((1 - FILETE2_R, -FILETE2_R), FILETE2_R, 0, 90)
            Line((1 - FILETE2_R, 0), (1, 0))
            Line((1, 0), (1, -FILETE2_R))
        make_face()
    revolve(axis=Axis((-6, -41, 0), (0, 0, 1)), revolution_arc=90, mode=Mode.SUBTRACT)
    with BuildSketch(Plane(origin=(-9, -39, 0), x_dir=(-1, 0, 0), z_dir=(0, 1, 0))) as filete2_3_piece_8:
        with BuildLine():
            CenterArc((1 + FILETE2_R, -FILETE2_R), FILETE2_R, 90, 90)
            Line((1 + FILETE2_R, 0), (1, 0))
            Line((1, 0), (1, -FILETE2_R))
        make_face()
    revolve(axis=Axis((-9, -39, 0), (0, 0, 1)), revolution_arc=90, mode=Mode.SUBTRACT)
    with BuildSketch(Plane(origin=(4, -42, 0), x_dir=(1, 0, 0), z_dir=(0, 1, 0))) as filete2_3_piece_9:
        with BuildLine():
            CenterArc((1 + FILETE2_R, FILETE2_R), FILETE2_R, 180, 90)
            Line((1 + FILETE2_R, 0), (1, 0))
            Line((1, 0), (1, FILETE2_R))
        make_face()
    revolve(axis=Axis((4, -42, 0), (0, 0, -1)), revolution_arc=90, mode=Mode.SUBTRACT)
    with BuildSketch(Plane(origin=(-4, -42, 0), x_dir=(0, -1, 0), z_dir=(1, 0, 0))) as filete2_3_piece_10:
        with BuildLine():
            CenterArc((1 + FILETE2_R, FILETE2_R), FILETE2_R, 180, 90)
            Line((1 + FILETE2_R, 0), (1, 0))
            Line((1, 0), (1, FILETE2_R))
        make_face()
    revolve(axis=Axis((-4, -42, 0), (0, 0, -1)), revolution_arc=90, mode=Mode.SUBTRACT)
    with BuildSketch(Plane(origin=(6, -41, 0), x_dir=(-1, 0, 0), z_dir=(0, -1, 0))) as filete2_3_piece_11:
        with BuildLine():
            CenterArc((1 - FILETE2_R, FILETE2_R), FILETE2_R, 270, 90)
            Line((1 - FILETE2_R, 0), (1, 0))
            Line((1, 0), (1, FILETE2_R))
        make_face()
    revolve(axis=Axis((6, -41, 0), (0, 0, -1)), revolution_arc=90, mode=Mode.SUBTRACT)

    # Esboço19 → Corte-extrusão7 (cut)
    with BuildSketch(Plane.ZY.offset(25)):
        with Locations(Location((-26, 2.05, 0), (0, 0, 270))):
            Circle(ESBO_O19_R)
        with Locations(Location((-6, 2.05, 0), (0, 0, 270))):
            Circle(ESBO_O19_R)
    extrude(amount=-CORTE_EXTRUS_O7_DEPTH, mode=Mode.SUBTRACT)


solid = part.part
